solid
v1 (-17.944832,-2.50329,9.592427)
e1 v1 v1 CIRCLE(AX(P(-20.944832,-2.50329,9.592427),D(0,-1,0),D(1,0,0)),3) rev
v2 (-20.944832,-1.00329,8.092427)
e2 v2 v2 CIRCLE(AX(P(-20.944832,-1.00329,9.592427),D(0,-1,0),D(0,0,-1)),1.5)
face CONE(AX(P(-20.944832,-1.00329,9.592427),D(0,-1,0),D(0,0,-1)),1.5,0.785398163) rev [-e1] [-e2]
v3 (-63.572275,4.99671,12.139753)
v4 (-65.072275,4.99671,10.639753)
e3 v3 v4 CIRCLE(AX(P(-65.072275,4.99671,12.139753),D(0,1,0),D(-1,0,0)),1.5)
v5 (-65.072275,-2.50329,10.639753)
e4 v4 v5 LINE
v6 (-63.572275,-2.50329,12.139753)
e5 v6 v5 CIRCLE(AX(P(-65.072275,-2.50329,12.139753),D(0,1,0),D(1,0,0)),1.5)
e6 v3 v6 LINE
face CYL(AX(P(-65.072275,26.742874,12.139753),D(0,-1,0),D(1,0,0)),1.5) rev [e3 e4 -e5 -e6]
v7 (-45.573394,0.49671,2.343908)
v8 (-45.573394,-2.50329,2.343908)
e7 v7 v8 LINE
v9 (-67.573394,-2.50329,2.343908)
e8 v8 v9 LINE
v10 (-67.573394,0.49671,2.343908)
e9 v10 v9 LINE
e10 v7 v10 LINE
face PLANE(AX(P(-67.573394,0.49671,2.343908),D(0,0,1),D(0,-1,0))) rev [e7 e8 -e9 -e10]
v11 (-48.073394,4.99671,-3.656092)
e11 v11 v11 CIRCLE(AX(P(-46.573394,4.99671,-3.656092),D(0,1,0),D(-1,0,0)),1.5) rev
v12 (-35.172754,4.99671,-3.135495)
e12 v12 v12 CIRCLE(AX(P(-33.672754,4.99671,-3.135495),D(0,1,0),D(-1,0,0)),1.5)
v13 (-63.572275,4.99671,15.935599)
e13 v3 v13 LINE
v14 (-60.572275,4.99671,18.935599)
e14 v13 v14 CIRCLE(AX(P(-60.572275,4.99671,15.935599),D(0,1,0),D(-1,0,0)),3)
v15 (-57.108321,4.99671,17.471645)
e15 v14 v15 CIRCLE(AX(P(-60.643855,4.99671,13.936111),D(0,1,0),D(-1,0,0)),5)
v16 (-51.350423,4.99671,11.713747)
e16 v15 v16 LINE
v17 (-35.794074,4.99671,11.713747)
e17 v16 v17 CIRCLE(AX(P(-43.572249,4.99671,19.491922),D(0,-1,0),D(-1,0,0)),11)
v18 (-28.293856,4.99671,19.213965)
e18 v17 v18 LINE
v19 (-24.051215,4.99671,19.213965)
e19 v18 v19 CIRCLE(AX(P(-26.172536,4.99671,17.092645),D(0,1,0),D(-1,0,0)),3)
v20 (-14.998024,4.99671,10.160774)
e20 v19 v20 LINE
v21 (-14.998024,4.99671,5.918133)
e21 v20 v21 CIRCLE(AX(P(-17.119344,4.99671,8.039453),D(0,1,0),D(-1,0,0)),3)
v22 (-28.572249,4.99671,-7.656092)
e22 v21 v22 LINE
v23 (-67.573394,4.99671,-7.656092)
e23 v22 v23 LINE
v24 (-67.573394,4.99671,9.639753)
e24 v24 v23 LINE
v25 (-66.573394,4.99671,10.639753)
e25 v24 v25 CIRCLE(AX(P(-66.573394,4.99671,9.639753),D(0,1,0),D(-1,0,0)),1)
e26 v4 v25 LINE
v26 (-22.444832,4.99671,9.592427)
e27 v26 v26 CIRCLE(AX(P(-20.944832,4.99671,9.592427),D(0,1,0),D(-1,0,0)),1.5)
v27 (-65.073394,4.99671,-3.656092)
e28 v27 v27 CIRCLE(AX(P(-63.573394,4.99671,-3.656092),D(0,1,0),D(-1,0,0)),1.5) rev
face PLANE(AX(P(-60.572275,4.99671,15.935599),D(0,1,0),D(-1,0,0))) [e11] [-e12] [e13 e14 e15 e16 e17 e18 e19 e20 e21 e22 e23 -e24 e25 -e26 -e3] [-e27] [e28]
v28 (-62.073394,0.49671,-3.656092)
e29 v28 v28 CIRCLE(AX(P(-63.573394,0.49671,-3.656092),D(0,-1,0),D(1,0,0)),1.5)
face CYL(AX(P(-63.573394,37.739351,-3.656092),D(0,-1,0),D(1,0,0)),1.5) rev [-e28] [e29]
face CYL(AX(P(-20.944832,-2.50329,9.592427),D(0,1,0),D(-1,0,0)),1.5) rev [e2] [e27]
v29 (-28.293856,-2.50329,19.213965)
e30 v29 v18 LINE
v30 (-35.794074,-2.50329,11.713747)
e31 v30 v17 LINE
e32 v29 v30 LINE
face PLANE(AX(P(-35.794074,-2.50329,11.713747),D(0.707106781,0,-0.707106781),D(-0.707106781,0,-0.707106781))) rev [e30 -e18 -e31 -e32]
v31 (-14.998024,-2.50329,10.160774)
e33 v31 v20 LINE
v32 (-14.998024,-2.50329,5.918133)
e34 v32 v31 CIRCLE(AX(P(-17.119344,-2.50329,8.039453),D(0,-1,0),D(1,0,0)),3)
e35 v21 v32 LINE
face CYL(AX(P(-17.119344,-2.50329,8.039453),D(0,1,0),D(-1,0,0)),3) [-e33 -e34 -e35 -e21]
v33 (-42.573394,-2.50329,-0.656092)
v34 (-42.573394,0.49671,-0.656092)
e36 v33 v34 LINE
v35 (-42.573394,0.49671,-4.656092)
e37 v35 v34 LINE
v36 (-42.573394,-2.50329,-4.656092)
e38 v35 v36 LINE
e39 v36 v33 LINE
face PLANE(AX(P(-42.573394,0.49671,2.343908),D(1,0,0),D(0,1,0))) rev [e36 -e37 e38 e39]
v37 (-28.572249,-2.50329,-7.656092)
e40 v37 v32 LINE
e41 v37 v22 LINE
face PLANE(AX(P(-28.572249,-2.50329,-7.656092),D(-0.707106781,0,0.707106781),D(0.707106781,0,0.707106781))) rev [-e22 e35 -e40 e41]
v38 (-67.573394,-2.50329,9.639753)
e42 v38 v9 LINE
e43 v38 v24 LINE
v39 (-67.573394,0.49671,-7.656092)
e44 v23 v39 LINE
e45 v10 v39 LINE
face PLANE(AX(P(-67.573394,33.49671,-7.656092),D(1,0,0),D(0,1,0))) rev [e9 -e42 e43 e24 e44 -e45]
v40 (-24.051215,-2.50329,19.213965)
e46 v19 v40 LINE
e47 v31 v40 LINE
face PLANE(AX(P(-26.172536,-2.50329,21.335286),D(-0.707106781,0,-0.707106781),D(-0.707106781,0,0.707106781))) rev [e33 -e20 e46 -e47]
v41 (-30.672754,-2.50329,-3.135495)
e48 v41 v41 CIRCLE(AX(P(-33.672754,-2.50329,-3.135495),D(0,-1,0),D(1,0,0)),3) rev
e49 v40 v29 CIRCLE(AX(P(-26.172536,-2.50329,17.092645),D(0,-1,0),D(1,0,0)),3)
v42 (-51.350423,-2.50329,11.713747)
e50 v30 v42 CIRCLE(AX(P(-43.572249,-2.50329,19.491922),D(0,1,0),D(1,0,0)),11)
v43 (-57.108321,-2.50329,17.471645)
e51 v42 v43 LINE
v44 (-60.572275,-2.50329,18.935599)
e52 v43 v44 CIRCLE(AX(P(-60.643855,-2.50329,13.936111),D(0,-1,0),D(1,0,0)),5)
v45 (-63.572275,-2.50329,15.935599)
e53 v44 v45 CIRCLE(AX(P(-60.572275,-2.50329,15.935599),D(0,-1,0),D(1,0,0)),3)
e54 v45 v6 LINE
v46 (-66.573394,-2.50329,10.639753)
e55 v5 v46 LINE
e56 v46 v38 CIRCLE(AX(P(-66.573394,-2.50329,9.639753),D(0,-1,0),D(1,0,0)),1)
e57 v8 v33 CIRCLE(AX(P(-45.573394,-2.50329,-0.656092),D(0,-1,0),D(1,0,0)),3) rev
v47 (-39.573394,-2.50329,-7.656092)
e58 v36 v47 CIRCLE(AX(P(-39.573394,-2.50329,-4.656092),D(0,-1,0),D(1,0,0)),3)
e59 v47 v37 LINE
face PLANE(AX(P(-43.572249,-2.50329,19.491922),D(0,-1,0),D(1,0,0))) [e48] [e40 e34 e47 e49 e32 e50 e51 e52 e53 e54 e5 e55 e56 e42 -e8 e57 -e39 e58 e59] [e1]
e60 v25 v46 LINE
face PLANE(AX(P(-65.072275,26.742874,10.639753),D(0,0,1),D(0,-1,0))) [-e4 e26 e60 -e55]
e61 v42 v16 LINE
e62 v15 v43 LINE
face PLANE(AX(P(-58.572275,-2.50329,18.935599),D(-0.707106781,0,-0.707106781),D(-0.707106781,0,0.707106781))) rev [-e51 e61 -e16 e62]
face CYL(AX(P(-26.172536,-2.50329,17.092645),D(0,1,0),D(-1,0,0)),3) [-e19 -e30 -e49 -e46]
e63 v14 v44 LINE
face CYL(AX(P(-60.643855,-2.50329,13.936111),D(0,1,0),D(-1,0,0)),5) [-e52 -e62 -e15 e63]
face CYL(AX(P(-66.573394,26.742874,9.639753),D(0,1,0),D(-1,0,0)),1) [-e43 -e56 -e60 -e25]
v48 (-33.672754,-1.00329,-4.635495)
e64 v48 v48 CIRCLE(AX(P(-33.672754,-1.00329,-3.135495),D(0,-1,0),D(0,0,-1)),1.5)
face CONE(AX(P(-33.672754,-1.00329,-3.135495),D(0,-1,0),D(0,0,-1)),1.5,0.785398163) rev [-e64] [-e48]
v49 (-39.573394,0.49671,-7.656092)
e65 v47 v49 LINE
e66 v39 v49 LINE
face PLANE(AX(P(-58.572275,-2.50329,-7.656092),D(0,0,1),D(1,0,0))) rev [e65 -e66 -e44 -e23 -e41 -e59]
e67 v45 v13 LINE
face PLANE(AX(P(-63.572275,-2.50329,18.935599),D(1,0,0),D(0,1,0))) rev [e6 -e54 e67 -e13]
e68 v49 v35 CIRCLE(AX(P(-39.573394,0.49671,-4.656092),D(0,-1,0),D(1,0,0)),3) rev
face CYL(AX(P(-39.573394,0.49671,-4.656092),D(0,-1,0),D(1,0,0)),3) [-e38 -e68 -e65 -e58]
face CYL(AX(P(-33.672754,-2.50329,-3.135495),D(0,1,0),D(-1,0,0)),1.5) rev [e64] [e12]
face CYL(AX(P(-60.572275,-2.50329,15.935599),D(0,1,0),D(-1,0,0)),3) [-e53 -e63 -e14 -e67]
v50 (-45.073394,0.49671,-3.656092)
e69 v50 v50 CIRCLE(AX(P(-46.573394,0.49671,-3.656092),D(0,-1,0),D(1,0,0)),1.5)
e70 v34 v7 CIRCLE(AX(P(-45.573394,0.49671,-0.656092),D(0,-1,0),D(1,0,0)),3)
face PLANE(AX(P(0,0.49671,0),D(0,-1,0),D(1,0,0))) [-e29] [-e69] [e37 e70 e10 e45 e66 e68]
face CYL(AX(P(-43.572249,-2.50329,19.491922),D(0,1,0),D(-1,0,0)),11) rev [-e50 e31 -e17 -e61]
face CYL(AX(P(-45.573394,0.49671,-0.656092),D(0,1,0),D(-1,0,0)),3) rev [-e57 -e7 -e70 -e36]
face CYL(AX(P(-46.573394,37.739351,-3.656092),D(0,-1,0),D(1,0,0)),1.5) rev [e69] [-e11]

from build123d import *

# Parameters (mm, degrees)
SKETCH3_R           = 1.5
BOSS_EXTRUDE1_DEPTH = 8
BOSS_EXTRUDE2_DEPTH = 8
BOSS_EXTRUDE3_DEPTH = 20
SKETCH10_R          = 7.5
SKETCH10_R_2        = 5
BOSS_EXTRUDE4_DEPTH = 10
FILLET1_R           = 3
CUT_EXTRUDE1_DEPTH  = 0.5
CUT_EXTRUDE2_START  = -0.5
CUT_EXTRUDE2_DEPTH  = 0.5
CHAMFER1_SIZE       = 3
SKETCH13_W          = 9.116659412
SKETCH13_H          = 8
BOSS_EXTRUDE5_DEPTH = 21
FILLET2_R           = 15
FILLET3_R           = 5
BOSS_EXTRUDE6_DEPTH = 7.5
SKETCH15_W          = 25
SKETCH15_H          = 10.000000005
CUT_EXTRUDE3_DEPTH  = 3
SKETCH17_W          = 25
SKETCH17_H          = 10.000000005
CUT_EXTRUDE4_DEPTH  = 3
FILLET4_R           = 3
SKETCH18_R          = 1.5
CUT_EXTRUDE5_DEPTH  = 36
SKETCH19_W          = 63.521473438
SKETCH19_H          = 44.294667312
CUT_EXTRUDE6_DEPTH  = 28.5
CHAMFER2_SIZE       = 1.5
FILLET5_R           = 1


with BuildPart() as part:
    # Sketch3 → Boss-Extrude1 (new body)
    with BuildSketch(Plane.XZ.offset(-5.496710387)):
        with BuildLine():
            Line((-58.572275019, 18.935598634), (-63.572275019, 18.935598634))
            Line((-63.572275019, 18.935598634), (-63.572275019, 5.639753178))
            Line((-63.572275019, 5.639753178), (-58.572275019, -7.656092278))
            Line((-58.572275019, -7.656092278), (-28.572248892, -7.656092278))
            Line((-28.572248892, -7.656092278), (-12.876703256, 8.039453359))
            Line((-12.876703256, 8.039453359), (-26.172535648, 21.335285751))
            Line((-26.172535648, 21.335285751), (-35.794074299, 11.7137471))
            ThreePointArc((-35.794074299, 11.7137471), (-43.572248892, 8.491921693), (-51.350423485, 11.7137471))
            Line((-51.350423485, 11.7137471), (-58.572275019, 18.935598634))
        make_face()
        with Locations((-33.672753955, -3.135495305)):
            Circle(SKETCH3_R, mode=Mode.SUBTRACT)
        with Locations((-20.944831894, 9.592426757)):
            Circle(SKETCH3_R, mode=Mode.SUBTRACT)
    extrude(amount=BOSS_EXTRUDE1_DEPTH)



with BuildPart() as body_2:
    # Sketch4 → Boss-Extrude2 (new body)
    with BuildSketch(Plane(origin=(0, 25.496710387, 0), x_dir=(1, 0, 0), z_dir=(0, 1, 0))):
        with BuildLine():
            Line((-65.072275019, -10.639753178), (-67.573393534, -10.639753178))
            Line((-67.573393534, -10.639753178), (-67.573393534, 7.656092278))
            Line((-67.573393534, 7.656092278), (-28.572248892, 7.656092278))
            Line((-28.572248892, 7.656092278), (-12.876703256, -8.039453359))
            Line((-12.876703256, -8.039453359), (-26.172535648, -21.335285751))
            Line((-26.172535648, -21.335285751), (-35.794074299, -11.7137471))
            ThreePointArc((-35.794074299, -11.7137471), (-43.572248892, -8.491921693), (-51.350423485, -11.7137471))
            Line((-51.350423485, -11.7137471), (-58.572275019, -18.935598634))
            Line((-58.572275019, -18.935598634), (-63.572275019, -18.935598634))
            Line((-63.572275019, -18.935598634), (-63.572275019, -12.139753178))
            ThreePointArc((-63.572275019, -12.139753178), (-64.011614847, -11.079093006), (-65.072275019, -10.639753178))
        make_face()
    extrude(amount=BOSS_EXTRUDE2_DEPTH)


with BuildPart() as part_1:
    add(part.part)

    add(body_2.part)  # Boss-Extrude3 merges body 2
    # Sketch9 → Boss-Extrude3 (add)
    with BuildSketch(Plane.XZ.offset(-25.496710387)):
        Polygon((-34.709554416, -7.656092278), (-42.709554416, 0.343907722), (-58.456734122, 0.343907722), (-58.456734122, -7.656092278), align=None)
    extrude(amount=BOSS_EXTRUDE3_DEPTH)

    # Sketch10 → Boss-Extrude4 (add)
    with BuildSketch(Plane(origin=(0, 0, -7.656092278), x_dir=(-1, 0, 0), z_dir=(0, 0, -1))):
        with Locations(Location((43.572275019, 15.496710387, 0), (0, 0, 180))):
            Circle(SKETCH10_R)
        with Locations((43.572275019, 15.496710387)):
            Circle(SKETCH10_R_2, mode=Mode.SUBTRACT)
    extrude(amount=BOSS_EXTRUDE4_DEPTH)

    # Fillet1
    fillet1_edges = [part_1.edges().sort_by_distance(p)[0] for p in [
        (-63.572275019, 1.496710387, 18.935598634),
        (-26.172535648, 1.496710387, 21.335285751),
        (-12.876703256, 1.496710387, 8.039453359),
        (-63.572275019, 29.496710387, 18.935598634),
        (-26.172535648, 29.496710387, 21.335285751),
        (-12.876703256, 29.496710387, 8.039453359),
    ]]
    fillet(fillet1_edges, radius=FILLET1_R)

    # Sketch11 → Cut-Extrude1 (cut)
    with BuildSketch(Plane.XZ.offset(-25.496710387)):
        with BuildLine():
            Line((-58.572275019, 18.935598634), (-60.572275019, 18.935598634))
            ThreePointArc((-60.572275019, 18.935598634), (-62.693595362, 18.056918977), (-63.572275019, 15.935598634))
            Line((-63.572275019, 15.935598634), (-63.572275019, 12.139753178))
            ThreePointArc((-63.572275019, 12.139753178), (-64.011614847, 11.079093006), (-65.072275019, 10.639753178))
            Line((-65.072275019, 10.639753178), (-67.573393534, 10.639753178))
            Line((-67.573393534, 10.639753178), (-67.573393534, -7.656092278))
            Line((-67.573393534, -7.656092278), (-58.456734122, -7.656092278))
            Line((-58.456734122, -7.656092278), (-58.456734122, 0.343907722))
            Line((-58.456734122, 0.343907722), (-42.709554416, 0.343907722))
            Line((-42.709554416, 0.343907722), (-34.709554416, -7.656092278))
            Line((-34.709554416, -7.656092278), (-28.572248892, -7.656092278))
            Line((-28.572248892, -7.656092278), (-14.998023599, 5.918133015))
            ThreePointArc((-14.998023599, 5.918133015), (-14.119343943, 8.039453359), (-14.998023599, 10.160773702))
            Line((-14.998023599, 10.160773702), (-24.051215304, 19.213965408))
            ThreePointArc((-24.051215304, 19.213965408), (-26.172535648, 20.092645064), (-28.293855992, 19.213965408))
            Line((-28.293855992, 19.213965408), (-35.794074299, 11.7137471))
            ThreePointArc((-35.794074299, 11.7137471), (-43.572248892, 8.491921693), (-51.350423485, 11.7137471))
            Line((-51.350423485, 11.7137471), (-58.572275019, 18.935598634))
        make_face()
    extrude(amount=-CUT_EXTRUDE1_DEPTH, mode=Mode.SUBTRACT)

    # Sketch12 → Cut-Extrude2 (cut)
    with BuildSketch(Plane(origin=(0, 5.496710387, 0), x_dir=(1, 0, 0), z_dir=(0, 1, 0)).offset(CUT_EXTRUDE2_START)):
        with BuildLine():
            Line((-67.573393534, -10.639753178), (-65.072275019, -10.639753178))
            ThreePointArc((-65.072275019, -10.639753178), (-64.011614847, -11.079093006), (-63.572275019, -12.139753178))
            Line((-63.572275019, -12.139753178), (-63.572275019, -15.935598634))
            ThreePointArc((-63.572275019, -15.935598634), (-62.693595362, -18.056918977), (-60.572275019, -18.935598634))
            Line((-60.572275019, -18.935598634), (-58.572275019, -18.935598634))
            Line((-58.572275019, -18.935598634), (-51.350423485, -11.7137471))
            ThreePointArc((-51.350423485, -11.7137471), (-43.572248892, -8.491921693), (-35.794074299, -11.7137471))
            Line((-35.794074299, -11.7137471), (-28.293855992, -19.213965408))
            ThreePointArc((-28.293855992, -19.213965408), (-26.172535648, -20.092645064), (-24.051215304, -19.213965408))
            Line((-24.051215304, -19.213965408), (-14.998023599, -10.160773702))
            ThreePointArc((-14.998023599, -10.160773702), (-14.119343943, -8.039453359), (-14.998023599, -5.918133015))
            Line((-14.998023599, -5.918133015), (-28.572248892, 7.656092278))
            Line((-28.572248892, 7.656092278), (-34.709554416, 7.656092278))
            Line((-34.709554416, 7.656092278), (-42.709554416, -0.343907722))
            Line((-42.709554416, -0.343907722), (-58.456734122, -0.343907722))
            Line((-58.456734122, -0.343907722), (-58.456734122, 7.656092278))
            Line((-58.456734122, 7.656092278), (-58.572275019, 7.656092278))
            Line((-58.572275019, 7.656092278), (-62.841209361, -3.695725977))
            ThreePointArc((-62.841209361, -3.695725977), (-63.941577707, -5.106321482), (-65.64921959, -5.639753178))
            Line((-65.64921959, -5.639753178), (-67.573393534, 7.656092278))
            Line((-67.573393534, 7.656092278), (-67.573393534, -10.639753178))
        make_face()
    extrude(amount=CUT_EXTRUDE2_DEPTH, mode=Mode.SUBTRACT)

    # Chamfer1
    # the kernel refuses this chamfer: 3 mm, written as the material it adds along each edge
    with BuildSketch(Plane(origin=(-43.572275019, 15.496710387, -7.656092278), x_dir=(1, 0, 0), z_dir=(0, 1, 0))) as chamfer1_piece_1_section:
        Polygon((7.5 + CHAMFER1_SIZE, 0), (7.5, CHAMFER1_SIZE), (7.5, 0), align=None)
    chamfer1_piece_1 = revolve(axis=Axis((-43.572275019, 15.496710387, -7.656092278), (0, 0, -1)), mode=Mode.PRIVATE)
    chamfer1_piece_1 = split(chamfer1_piece_1, bisect_by=Plane(origin=(-42.890914717, 15.496710387, 0.525268024), z_dir=(-0.7071067811865474, 0, -0.7071067811865477)), keep=Keep.TOP, mode=Mode.PRIVATE)
    add(chamfer1_piece_1)

    # Sketch13 → Boss-Extrude5 (add)
    with BuildSketch(Plane.XZ.offset(-25.996710387)):
        with Locations((-63.015063828, -3.656092278)):
            Rectangle(SKETCH13_W, SKETCH13_H)
    extrude(amount=BOSS_EXTRUDE5_DEPTH)

    # Fillet2
    fillet2_edges = [part_1.edges().sort_by_distance(p)[0] for p in [
        (-63.572275019, 1.246710387, 5.639753178),
    ]]
    fillet(fillet2_edges, radius=FILLET2_R)

    # Fillet3
    # the kernel refuses this fillet: 5 mm, written as the material it takes off along each edge
    with BuildSketch(Plane(origin=(-58.572275019, 20.819040858, 18.935598634), x_dir=(0.7071067811865416, 0, -0.7071067811865536), z_dir=(0, 1, 0)), Plane(origin=(-58.572275019, 10.174379917, 18.935598634), x_dir=(-1, 0, 0), z_dir=(0, -1, 0))) as fillet3_piece_1:
        with BuildLine():
            CenterArc((FILLET3_R * 0.414213562373, FILLET3_R), FILLET3_R, 225, 45)
            Line((-FILLET3_R * 0.292893218813, FILLET3_R * 0.292893218813), (-FILLET3_R * 0.307035354437, FILLET3_R * 0.27875108319))
            Line((-FILLET3_R * 0.307035354437, FILLET3_R * 0.27875108319), (-FILLET3_R * 0.00828427124746, -FILLET3_R * 0.02))
            Line((-FILLET3_R * 0.00828427124746, -FILLET3_R * 0.02), (FILLET3_R * 0.414213562373, -FILLET3_R * 0.02))
            Line((FILLET3_R * 0.414213562373, -FILLET3_R * 0.02), (FILLET3_R * 0.414213562373, 0))
        make_face()
    extrude(amount=17.855339059, mode=Mode.SUBTRACT)

    # Sketch14 → Boss-Extrude6 (add)
    with BuildSketch(Plane.XZ.offset(2.503289613)):
        with BuildLine():
            Line((-62.612326164, 3.087086856), (-58.572275019, -7.656092278))
            Line((-58.572275019, -7.656092278), (-67.573393534, -7.656092278))
            Line((-67.573393534, -7.656092278), (-67.573393534, 10.639753178))
            Line((-67.573393534, 10.639753178), (-65.072275019, 10.639753178))
            ThreePointArc((-65.072275019, 10.639753178), (-64.011614847, 11.079093006), (-63.572275019, 12.139753178))
            Line((-63.572275019, 12.139753178), (-63.572275019, 8.366950853))
            ThreePointArc((-63.572275019, 8.366950853), (-63.330336666, 5.683740759), (-62.612326164, 3.087086856))
        make_face()
    extrude(amount=-BOSS_EXTRUDE6_DEPTH)

    # Sketch15 → Cut-Extrude3 (cut)
    with BuildSketch(Plane.XZ.offset(2.503289613)):
        with Locations((-55.073393534, -2.656092276)):
            Rectangle(SKETCH15_W, SKETCH15_H)
    extrude(amount=-CUT_EXTRUDE3_DEPTH, mode=Mode.SUBTRACT)

    # Sketch17 → Cut-Extrude4 (cut)
    with BuildSketch(Plane(origin=(0, 33.496710387, 0), x_dir=(1, 0, 0), z_dir=(0, 1, 0))):
        with Locations((-55.073393534, 2.656092276)):
            Rectangle(SKETCH17_W, SKETCH17_H)
    extrude(amount=-CUT_EXTRUDE4_DEPTH, mode=Mode.SUBTRACT)

    # Fillet4
    fillet4_edges = [part_1.edges().sort_by_distance(p)[0] for p in [
        (-42.573393534, -1.003289613, 2.343907727),
        (-42.573393534, -1.003289613, -7.656092278),
        (-42.573393534, 31.996710387, 2.343907727),
        (-42.573393534, 31.996710387, -7.656092278),
    ]]
    fillet(fillet4_edges, radius=FILLET4_R)

    # Sketch18 → Cut-Extrude5 (cut)
    with BuildSketch(Plane.XZ.offset(2.503289613)):
        with Locations((-46.573393534, -3.65609228)):
            Circle(SKETCH18_R)
        with Locations((-63.573393534, -3.656092278)):
            Circle(SKETCH18_R)
    extrude(amount=-CUT_EXTRUDE5_DEPTH, mode=Mode.SUBTRACT)

    # Sketch19 → Cut-Extrude6 (cut)
    with BuildSketch(Plane(origin=(0, 33.496710387, 0), x_dir=(1, 0, 0), z_dir=(0, 1, 0))):
        with Locations((-40.836204684, -1.568816282)):
            Rectangle(SKETCH19_W, SKETCH19_H)
    extrude(amount=-CUT_EXTRUDE6_DEPTH, mode=Mode.SUBTRACT)

    # Chamfer2
    chamfer2_edges = [part_1.edges().sort_by_distance(p)[0] for p in [
        (-35.172753955, -2.503289613, -3.135495305),
        (-22.444831894, -2.503289613, 9.592426757),
    ]]
    chamfer(chamfer2_edges, length=CHAMFER2_SIZE)

    # Fillet5
    fillet5_edges = [part_1.edges().sort_by_distance(p)[0] for p in [
        (-67.573393534, 1.246710387, 10.639753178),
    ]]
    fillet(fillet5_edges, radius=FILLET5_R)


solid = part_1.part
